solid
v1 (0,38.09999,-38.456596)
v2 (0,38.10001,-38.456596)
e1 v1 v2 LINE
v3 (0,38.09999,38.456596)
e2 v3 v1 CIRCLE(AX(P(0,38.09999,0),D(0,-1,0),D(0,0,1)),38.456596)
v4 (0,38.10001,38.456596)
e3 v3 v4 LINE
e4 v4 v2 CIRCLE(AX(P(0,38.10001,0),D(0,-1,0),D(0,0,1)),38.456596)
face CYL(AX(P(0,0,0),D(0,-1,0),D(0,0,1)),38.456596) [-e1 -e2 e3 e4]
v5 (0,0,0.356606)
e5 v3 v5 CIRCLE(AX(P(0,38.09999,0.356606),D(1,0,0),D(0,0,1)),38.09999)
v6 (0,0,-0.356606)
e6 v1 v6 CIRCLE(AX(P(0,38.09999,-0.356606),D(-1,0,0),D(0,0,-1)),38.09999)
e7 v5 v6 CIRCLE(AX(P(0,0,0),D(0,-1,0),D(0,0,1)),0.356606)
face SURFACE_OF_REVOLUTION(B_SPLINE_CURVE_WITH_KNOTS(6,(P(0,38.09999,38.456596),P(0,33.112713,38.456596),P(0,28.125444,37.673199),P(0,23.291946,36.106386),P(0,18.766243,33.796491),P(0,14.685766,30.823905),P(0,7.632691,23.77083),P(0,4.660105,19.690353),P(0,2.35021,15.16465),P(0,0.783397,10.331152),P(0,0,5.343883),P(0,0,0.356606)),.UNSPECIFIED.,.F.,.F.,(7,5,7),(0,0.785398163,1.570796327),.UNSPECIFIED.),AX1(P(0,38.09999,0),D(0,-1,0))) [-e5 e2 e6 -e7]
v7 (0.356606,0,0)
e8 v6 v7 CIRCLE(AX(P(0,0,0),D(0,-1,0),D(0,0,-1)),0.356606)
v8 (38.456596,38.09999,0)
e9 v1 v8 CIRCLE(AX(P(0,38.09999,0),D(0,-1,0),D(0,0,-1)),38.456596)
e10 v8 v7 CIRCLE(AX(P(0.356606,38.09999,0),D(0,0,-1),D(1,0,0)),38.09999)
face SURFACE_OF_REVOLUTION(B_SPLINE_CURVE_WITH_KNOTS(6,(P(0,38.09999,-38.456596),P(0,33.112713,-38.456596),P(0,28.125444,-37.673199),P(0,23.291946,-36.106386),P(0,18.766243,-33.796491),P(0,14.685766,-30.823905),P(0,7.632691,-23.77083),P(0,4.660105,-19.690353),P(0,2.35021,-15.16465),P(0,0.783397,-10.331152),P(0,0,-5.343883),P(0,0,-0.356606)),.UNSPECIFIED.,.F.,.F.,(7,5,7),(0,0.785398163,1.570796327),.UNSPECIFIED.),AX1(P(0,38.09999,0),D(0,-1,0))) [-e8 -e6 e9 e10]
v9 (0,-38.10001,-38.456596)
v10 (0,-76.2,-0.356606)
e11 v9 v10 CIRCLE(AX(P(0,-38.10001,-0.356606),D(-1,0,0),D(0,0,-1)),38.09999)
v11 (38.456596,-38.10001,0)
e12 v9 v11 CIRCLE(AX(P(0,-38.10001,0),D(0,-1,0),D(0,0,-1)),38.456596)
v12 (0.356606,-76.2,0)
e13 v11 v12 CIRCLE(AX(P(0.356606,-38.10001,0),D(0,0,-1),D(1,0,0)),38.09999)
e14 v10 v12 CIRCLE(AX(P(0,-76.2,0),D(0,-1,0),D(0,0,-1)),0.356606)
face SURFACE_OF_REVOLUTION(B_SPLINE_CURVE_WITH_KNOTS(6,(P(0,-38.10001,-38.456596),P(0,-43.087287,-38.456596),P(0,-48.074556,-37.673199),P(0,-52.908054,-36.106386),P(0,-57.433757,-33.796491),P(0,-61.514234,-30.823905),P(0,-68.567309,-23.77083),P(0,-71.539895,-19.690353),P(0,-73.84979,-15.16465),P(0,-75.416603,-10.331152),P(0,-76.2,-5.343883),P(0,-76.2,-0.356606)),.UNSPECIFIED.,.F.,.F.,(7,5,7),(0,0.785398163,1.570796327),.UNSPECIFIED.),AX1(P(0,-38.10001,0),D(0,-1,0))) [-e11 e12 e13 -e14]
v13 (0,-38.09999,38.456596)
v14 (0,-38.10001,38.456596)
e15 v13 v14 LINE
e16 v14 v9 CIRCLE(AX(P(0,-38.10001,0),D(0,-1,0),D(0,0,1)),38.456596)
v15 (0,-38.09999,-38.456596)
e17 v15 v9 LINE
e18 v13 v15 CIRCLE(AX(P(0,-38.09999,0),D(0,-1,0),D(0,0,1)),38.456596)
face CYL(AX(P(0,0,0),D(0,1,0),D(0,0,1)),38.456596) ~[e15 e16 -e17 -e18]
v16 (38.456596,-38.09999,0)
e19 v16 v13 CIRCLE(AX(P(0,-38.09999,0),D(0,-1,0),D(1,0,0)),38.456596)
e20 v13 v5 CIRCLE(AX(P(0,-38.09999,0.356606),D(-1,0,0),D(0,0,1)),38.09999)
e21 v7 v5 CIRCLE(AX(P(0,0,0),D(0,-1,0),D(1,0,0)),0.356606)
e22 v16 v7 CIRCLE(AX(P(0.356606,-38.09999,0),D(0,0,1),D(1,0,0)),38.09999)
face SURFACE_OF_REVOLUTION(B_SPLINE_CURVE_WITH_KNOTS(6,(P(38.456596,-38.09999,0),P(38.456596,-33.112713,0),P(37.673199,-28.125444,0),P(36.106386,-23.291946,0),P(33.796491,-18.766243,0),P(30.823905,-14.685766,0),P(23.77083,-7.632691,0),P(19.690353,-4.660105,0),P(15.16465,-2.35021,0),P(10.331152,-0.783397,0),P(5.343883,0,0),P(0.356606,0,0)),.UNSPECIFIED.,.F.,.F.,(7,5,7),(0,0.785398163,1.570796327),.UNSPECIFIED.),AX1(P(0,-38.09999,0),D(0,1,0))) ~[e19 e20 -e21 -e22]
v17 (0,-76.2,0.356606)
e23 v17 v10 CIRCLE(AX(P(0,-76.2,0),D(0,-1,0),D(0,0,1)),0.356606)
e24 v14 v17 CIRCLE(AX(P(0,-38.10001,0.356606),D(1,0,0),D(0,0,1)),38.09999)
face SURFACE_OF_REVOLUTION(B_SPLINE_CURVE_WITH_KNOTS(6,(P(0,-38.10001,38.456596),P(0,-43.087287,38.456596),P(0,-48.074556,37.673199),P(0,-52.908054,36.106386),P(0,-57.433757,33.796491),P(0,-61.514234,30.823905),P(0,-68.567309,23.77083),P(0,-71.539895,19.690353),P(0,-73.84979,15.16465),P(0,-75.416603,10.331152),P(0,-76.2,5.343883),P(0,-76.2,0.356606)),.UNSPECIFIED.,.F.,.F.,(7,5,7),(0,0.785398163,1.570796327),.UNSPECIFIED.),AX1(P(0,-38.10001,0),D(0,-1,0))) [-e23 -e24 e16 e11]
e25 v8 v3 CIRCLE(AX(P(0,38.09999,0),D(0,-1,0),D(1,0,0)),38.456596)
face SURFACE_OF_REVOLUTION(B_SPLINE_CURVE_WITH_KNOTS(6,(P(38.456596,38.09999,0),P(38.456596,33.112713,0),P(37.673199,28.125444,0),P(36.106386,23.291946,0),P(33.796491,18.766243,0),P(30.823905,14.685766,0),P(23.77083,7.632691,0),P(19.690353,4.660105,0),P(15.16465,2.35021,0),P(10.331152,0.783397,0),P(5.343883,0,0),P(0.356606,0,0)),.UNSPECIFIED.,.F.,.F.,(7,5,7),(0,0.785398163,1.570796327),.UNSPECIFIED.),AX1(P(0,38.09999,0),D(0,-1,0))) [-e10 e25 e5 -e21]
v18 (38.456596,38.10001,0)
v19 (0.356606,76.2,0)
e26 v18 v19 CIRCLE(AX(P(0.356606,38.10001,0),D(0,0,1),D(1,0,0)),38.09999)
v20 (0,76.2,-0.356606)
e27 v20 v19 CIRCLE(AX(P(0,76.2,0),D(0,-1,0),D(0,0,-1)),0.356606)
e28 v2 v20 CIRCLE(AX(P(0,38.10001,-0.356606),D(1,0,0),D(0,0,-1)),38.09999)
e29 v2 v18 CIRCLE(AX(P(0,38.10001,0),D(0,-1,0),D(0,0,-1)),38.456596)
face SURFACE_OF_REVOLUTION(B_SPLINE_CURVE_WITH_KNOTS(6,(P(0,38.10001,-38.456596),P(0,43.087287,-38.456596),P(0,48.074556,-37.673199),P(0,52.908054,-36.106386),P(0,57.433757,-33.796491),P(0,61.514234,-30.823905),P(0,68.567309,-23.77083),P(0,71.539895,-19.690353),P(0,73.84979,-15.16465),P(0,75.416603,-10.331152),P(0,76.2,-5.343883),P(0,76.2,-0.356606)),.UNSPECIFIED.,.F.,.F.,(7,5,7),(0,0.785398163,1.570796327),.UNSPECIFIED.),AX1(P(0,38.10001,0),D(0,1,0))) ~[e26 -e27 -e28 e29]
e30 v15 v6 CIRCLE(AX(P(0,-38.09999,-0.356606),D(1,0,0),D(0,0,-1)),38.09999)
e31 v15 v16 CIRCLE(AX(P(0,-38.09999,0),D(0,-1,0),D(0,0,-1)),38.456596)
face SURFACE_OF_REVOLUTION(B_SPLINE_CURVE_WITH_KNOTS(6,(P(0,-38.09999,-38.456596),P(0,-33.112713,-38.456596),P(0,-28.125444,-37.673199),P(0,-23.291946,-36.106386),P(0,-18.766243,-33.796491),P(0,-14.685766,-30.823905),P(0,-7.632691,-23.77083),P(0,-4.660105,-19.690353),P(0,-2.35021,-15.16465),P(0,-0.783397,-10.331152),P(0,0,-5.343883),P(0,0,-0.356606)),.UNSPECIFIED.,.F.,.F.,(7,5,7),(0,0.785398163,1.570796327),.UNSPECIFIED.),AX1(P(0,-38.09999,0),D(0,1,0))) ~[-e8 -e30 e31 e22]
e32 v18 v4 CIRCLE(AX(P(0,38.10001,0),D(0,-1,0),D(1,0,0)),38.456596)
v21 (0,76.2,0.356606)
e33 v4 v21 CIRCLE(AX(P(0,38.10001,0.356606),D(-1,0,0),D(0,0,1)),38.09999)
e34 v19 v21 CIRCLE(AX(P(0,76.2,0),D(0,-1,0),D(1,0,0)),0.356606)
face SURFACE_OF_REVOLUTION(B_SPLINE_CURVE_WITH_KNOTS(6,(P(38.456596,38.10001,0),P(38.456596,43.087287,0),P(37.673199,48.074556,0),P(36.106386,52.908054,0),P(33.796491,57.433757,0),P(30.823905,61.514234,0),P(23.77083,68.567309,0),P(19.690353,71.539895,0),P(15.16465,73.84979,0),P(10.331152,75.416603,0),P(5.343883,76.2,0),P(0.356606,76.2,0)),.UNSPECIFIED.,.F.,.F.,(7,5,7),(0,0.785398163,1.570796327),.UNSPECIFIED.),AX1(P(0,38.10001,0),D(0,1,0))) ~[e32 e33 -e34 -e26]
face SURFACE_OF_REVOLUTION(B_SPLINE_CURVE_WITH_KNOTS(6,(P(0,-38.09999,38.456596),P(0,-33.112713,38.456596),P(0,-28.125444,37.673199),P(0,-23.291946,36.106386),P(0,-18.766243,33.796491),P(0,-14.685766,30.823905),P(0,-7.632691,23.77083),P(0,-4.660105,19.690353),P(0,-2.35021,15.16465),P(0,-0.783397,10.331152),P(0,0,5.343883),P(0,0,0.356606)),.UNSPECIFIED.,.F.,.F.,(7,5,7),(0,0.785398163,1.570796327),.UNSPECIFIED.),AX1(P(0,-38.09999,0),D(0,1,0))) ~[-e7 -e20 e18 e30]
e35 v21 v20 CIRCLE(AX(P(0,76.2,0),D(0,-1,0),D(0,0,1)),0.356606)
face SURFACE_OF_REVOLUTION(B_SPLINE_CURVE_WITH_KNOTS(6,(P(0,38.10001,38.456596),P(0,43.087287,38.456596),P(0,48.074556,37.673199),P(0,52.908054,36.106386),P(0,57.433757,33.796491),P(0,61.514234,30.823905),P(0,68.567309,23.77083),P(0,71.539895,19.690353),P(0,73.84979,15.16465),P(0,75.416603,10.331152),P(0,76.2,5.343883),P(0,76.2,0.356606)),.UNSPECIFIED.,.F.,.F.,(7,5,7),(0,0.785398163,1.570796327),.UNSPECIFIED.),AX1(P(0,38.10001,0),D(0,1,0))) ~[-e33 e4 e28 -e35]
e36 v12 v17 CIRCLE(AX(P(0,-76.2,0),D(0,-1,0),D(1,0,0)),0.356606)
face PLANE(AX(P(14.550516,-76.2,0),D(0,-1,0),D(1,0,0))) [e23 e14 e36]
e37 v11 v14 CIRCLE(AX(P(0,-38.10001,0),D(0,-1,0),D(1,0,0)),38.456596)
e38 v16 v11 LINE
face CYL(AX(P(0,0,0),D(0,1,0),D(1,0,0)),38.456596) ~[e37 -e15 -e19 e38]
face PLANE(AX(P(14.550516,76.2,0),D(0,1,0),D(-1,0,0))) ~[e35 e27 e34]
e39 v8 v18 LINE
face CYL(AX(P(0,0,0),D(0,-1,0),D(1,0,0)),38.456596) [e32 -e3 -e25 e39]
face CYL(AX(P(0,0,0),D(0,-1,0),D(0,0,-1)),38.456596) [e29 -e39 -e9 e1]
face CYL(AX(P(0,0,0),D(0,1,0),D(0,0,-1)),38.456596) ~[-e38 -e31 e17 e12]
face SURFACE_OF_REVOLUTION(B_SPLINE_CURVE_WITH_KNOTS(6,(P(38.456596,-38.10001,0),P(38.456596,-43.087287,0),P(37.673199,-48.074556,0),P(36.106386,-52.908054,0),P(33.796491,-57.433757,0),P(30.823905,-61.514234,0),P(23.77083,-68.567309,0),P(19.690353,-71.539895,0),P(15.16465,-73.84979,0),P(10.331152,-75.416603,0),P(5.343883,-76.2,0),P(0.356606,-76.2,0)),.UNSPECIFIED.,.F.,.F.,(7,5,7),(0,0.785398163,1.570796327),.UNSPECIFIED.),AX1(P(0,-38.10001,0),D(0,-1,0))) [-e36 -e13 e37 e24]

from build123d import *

# Parameters (mm, degrees)
F1_DEPTH = 76.2
F2_R     = 38.09999


# Not quite as in the source:
# - a fillet or chamfer is up to 0.001 mm smaller than in the source, because OpenCascade refuses the exact size


with BuildPart() as f1:
    # F0 (on Front) → F1 (new body)
    with BuildSketch(Plane.XZ):
        with BuildLine():
            ThreePointArc((0, -38.4565959736), (27.1929197943, -27.1929197943), (38.4565959736, 0))
            ThreePointArc((38.4565959736, 0), (27.1929197943, 27.1929197943), (0, 38.4565959736))
            Line((0, 38.4565959736), (0, -38.4565959736))
        make_face()
        with BuildLine():
            Line((0, -38.4565959736), (0, 38.4565959736))
            ThreePointArc((0, 38.4565959736), (-38.4565959736, 0), (0, -38.4565959736))
        make_face()
    extrude(amount=F1_DEPTH)

    # F2 (radius 38.1 in the source; OpenCascade refuses exactly that, so slightly less here)
    f2_edges = [f1.edges().sort_by_distance(p)[0] for p in [
        (38.456596, -38.1, 0),
        (-38.456596, 0, 0),
        (-38.456596, -76.2, 0),
    ]]
    fillet(f2_edges, radius=F2_R)

    # F3: F1 across plane


with BuildPart() as f1_1:
    add(f1.part)
    add(f1.part.mirror(Plane.XZ))


solid = f1_1.part
